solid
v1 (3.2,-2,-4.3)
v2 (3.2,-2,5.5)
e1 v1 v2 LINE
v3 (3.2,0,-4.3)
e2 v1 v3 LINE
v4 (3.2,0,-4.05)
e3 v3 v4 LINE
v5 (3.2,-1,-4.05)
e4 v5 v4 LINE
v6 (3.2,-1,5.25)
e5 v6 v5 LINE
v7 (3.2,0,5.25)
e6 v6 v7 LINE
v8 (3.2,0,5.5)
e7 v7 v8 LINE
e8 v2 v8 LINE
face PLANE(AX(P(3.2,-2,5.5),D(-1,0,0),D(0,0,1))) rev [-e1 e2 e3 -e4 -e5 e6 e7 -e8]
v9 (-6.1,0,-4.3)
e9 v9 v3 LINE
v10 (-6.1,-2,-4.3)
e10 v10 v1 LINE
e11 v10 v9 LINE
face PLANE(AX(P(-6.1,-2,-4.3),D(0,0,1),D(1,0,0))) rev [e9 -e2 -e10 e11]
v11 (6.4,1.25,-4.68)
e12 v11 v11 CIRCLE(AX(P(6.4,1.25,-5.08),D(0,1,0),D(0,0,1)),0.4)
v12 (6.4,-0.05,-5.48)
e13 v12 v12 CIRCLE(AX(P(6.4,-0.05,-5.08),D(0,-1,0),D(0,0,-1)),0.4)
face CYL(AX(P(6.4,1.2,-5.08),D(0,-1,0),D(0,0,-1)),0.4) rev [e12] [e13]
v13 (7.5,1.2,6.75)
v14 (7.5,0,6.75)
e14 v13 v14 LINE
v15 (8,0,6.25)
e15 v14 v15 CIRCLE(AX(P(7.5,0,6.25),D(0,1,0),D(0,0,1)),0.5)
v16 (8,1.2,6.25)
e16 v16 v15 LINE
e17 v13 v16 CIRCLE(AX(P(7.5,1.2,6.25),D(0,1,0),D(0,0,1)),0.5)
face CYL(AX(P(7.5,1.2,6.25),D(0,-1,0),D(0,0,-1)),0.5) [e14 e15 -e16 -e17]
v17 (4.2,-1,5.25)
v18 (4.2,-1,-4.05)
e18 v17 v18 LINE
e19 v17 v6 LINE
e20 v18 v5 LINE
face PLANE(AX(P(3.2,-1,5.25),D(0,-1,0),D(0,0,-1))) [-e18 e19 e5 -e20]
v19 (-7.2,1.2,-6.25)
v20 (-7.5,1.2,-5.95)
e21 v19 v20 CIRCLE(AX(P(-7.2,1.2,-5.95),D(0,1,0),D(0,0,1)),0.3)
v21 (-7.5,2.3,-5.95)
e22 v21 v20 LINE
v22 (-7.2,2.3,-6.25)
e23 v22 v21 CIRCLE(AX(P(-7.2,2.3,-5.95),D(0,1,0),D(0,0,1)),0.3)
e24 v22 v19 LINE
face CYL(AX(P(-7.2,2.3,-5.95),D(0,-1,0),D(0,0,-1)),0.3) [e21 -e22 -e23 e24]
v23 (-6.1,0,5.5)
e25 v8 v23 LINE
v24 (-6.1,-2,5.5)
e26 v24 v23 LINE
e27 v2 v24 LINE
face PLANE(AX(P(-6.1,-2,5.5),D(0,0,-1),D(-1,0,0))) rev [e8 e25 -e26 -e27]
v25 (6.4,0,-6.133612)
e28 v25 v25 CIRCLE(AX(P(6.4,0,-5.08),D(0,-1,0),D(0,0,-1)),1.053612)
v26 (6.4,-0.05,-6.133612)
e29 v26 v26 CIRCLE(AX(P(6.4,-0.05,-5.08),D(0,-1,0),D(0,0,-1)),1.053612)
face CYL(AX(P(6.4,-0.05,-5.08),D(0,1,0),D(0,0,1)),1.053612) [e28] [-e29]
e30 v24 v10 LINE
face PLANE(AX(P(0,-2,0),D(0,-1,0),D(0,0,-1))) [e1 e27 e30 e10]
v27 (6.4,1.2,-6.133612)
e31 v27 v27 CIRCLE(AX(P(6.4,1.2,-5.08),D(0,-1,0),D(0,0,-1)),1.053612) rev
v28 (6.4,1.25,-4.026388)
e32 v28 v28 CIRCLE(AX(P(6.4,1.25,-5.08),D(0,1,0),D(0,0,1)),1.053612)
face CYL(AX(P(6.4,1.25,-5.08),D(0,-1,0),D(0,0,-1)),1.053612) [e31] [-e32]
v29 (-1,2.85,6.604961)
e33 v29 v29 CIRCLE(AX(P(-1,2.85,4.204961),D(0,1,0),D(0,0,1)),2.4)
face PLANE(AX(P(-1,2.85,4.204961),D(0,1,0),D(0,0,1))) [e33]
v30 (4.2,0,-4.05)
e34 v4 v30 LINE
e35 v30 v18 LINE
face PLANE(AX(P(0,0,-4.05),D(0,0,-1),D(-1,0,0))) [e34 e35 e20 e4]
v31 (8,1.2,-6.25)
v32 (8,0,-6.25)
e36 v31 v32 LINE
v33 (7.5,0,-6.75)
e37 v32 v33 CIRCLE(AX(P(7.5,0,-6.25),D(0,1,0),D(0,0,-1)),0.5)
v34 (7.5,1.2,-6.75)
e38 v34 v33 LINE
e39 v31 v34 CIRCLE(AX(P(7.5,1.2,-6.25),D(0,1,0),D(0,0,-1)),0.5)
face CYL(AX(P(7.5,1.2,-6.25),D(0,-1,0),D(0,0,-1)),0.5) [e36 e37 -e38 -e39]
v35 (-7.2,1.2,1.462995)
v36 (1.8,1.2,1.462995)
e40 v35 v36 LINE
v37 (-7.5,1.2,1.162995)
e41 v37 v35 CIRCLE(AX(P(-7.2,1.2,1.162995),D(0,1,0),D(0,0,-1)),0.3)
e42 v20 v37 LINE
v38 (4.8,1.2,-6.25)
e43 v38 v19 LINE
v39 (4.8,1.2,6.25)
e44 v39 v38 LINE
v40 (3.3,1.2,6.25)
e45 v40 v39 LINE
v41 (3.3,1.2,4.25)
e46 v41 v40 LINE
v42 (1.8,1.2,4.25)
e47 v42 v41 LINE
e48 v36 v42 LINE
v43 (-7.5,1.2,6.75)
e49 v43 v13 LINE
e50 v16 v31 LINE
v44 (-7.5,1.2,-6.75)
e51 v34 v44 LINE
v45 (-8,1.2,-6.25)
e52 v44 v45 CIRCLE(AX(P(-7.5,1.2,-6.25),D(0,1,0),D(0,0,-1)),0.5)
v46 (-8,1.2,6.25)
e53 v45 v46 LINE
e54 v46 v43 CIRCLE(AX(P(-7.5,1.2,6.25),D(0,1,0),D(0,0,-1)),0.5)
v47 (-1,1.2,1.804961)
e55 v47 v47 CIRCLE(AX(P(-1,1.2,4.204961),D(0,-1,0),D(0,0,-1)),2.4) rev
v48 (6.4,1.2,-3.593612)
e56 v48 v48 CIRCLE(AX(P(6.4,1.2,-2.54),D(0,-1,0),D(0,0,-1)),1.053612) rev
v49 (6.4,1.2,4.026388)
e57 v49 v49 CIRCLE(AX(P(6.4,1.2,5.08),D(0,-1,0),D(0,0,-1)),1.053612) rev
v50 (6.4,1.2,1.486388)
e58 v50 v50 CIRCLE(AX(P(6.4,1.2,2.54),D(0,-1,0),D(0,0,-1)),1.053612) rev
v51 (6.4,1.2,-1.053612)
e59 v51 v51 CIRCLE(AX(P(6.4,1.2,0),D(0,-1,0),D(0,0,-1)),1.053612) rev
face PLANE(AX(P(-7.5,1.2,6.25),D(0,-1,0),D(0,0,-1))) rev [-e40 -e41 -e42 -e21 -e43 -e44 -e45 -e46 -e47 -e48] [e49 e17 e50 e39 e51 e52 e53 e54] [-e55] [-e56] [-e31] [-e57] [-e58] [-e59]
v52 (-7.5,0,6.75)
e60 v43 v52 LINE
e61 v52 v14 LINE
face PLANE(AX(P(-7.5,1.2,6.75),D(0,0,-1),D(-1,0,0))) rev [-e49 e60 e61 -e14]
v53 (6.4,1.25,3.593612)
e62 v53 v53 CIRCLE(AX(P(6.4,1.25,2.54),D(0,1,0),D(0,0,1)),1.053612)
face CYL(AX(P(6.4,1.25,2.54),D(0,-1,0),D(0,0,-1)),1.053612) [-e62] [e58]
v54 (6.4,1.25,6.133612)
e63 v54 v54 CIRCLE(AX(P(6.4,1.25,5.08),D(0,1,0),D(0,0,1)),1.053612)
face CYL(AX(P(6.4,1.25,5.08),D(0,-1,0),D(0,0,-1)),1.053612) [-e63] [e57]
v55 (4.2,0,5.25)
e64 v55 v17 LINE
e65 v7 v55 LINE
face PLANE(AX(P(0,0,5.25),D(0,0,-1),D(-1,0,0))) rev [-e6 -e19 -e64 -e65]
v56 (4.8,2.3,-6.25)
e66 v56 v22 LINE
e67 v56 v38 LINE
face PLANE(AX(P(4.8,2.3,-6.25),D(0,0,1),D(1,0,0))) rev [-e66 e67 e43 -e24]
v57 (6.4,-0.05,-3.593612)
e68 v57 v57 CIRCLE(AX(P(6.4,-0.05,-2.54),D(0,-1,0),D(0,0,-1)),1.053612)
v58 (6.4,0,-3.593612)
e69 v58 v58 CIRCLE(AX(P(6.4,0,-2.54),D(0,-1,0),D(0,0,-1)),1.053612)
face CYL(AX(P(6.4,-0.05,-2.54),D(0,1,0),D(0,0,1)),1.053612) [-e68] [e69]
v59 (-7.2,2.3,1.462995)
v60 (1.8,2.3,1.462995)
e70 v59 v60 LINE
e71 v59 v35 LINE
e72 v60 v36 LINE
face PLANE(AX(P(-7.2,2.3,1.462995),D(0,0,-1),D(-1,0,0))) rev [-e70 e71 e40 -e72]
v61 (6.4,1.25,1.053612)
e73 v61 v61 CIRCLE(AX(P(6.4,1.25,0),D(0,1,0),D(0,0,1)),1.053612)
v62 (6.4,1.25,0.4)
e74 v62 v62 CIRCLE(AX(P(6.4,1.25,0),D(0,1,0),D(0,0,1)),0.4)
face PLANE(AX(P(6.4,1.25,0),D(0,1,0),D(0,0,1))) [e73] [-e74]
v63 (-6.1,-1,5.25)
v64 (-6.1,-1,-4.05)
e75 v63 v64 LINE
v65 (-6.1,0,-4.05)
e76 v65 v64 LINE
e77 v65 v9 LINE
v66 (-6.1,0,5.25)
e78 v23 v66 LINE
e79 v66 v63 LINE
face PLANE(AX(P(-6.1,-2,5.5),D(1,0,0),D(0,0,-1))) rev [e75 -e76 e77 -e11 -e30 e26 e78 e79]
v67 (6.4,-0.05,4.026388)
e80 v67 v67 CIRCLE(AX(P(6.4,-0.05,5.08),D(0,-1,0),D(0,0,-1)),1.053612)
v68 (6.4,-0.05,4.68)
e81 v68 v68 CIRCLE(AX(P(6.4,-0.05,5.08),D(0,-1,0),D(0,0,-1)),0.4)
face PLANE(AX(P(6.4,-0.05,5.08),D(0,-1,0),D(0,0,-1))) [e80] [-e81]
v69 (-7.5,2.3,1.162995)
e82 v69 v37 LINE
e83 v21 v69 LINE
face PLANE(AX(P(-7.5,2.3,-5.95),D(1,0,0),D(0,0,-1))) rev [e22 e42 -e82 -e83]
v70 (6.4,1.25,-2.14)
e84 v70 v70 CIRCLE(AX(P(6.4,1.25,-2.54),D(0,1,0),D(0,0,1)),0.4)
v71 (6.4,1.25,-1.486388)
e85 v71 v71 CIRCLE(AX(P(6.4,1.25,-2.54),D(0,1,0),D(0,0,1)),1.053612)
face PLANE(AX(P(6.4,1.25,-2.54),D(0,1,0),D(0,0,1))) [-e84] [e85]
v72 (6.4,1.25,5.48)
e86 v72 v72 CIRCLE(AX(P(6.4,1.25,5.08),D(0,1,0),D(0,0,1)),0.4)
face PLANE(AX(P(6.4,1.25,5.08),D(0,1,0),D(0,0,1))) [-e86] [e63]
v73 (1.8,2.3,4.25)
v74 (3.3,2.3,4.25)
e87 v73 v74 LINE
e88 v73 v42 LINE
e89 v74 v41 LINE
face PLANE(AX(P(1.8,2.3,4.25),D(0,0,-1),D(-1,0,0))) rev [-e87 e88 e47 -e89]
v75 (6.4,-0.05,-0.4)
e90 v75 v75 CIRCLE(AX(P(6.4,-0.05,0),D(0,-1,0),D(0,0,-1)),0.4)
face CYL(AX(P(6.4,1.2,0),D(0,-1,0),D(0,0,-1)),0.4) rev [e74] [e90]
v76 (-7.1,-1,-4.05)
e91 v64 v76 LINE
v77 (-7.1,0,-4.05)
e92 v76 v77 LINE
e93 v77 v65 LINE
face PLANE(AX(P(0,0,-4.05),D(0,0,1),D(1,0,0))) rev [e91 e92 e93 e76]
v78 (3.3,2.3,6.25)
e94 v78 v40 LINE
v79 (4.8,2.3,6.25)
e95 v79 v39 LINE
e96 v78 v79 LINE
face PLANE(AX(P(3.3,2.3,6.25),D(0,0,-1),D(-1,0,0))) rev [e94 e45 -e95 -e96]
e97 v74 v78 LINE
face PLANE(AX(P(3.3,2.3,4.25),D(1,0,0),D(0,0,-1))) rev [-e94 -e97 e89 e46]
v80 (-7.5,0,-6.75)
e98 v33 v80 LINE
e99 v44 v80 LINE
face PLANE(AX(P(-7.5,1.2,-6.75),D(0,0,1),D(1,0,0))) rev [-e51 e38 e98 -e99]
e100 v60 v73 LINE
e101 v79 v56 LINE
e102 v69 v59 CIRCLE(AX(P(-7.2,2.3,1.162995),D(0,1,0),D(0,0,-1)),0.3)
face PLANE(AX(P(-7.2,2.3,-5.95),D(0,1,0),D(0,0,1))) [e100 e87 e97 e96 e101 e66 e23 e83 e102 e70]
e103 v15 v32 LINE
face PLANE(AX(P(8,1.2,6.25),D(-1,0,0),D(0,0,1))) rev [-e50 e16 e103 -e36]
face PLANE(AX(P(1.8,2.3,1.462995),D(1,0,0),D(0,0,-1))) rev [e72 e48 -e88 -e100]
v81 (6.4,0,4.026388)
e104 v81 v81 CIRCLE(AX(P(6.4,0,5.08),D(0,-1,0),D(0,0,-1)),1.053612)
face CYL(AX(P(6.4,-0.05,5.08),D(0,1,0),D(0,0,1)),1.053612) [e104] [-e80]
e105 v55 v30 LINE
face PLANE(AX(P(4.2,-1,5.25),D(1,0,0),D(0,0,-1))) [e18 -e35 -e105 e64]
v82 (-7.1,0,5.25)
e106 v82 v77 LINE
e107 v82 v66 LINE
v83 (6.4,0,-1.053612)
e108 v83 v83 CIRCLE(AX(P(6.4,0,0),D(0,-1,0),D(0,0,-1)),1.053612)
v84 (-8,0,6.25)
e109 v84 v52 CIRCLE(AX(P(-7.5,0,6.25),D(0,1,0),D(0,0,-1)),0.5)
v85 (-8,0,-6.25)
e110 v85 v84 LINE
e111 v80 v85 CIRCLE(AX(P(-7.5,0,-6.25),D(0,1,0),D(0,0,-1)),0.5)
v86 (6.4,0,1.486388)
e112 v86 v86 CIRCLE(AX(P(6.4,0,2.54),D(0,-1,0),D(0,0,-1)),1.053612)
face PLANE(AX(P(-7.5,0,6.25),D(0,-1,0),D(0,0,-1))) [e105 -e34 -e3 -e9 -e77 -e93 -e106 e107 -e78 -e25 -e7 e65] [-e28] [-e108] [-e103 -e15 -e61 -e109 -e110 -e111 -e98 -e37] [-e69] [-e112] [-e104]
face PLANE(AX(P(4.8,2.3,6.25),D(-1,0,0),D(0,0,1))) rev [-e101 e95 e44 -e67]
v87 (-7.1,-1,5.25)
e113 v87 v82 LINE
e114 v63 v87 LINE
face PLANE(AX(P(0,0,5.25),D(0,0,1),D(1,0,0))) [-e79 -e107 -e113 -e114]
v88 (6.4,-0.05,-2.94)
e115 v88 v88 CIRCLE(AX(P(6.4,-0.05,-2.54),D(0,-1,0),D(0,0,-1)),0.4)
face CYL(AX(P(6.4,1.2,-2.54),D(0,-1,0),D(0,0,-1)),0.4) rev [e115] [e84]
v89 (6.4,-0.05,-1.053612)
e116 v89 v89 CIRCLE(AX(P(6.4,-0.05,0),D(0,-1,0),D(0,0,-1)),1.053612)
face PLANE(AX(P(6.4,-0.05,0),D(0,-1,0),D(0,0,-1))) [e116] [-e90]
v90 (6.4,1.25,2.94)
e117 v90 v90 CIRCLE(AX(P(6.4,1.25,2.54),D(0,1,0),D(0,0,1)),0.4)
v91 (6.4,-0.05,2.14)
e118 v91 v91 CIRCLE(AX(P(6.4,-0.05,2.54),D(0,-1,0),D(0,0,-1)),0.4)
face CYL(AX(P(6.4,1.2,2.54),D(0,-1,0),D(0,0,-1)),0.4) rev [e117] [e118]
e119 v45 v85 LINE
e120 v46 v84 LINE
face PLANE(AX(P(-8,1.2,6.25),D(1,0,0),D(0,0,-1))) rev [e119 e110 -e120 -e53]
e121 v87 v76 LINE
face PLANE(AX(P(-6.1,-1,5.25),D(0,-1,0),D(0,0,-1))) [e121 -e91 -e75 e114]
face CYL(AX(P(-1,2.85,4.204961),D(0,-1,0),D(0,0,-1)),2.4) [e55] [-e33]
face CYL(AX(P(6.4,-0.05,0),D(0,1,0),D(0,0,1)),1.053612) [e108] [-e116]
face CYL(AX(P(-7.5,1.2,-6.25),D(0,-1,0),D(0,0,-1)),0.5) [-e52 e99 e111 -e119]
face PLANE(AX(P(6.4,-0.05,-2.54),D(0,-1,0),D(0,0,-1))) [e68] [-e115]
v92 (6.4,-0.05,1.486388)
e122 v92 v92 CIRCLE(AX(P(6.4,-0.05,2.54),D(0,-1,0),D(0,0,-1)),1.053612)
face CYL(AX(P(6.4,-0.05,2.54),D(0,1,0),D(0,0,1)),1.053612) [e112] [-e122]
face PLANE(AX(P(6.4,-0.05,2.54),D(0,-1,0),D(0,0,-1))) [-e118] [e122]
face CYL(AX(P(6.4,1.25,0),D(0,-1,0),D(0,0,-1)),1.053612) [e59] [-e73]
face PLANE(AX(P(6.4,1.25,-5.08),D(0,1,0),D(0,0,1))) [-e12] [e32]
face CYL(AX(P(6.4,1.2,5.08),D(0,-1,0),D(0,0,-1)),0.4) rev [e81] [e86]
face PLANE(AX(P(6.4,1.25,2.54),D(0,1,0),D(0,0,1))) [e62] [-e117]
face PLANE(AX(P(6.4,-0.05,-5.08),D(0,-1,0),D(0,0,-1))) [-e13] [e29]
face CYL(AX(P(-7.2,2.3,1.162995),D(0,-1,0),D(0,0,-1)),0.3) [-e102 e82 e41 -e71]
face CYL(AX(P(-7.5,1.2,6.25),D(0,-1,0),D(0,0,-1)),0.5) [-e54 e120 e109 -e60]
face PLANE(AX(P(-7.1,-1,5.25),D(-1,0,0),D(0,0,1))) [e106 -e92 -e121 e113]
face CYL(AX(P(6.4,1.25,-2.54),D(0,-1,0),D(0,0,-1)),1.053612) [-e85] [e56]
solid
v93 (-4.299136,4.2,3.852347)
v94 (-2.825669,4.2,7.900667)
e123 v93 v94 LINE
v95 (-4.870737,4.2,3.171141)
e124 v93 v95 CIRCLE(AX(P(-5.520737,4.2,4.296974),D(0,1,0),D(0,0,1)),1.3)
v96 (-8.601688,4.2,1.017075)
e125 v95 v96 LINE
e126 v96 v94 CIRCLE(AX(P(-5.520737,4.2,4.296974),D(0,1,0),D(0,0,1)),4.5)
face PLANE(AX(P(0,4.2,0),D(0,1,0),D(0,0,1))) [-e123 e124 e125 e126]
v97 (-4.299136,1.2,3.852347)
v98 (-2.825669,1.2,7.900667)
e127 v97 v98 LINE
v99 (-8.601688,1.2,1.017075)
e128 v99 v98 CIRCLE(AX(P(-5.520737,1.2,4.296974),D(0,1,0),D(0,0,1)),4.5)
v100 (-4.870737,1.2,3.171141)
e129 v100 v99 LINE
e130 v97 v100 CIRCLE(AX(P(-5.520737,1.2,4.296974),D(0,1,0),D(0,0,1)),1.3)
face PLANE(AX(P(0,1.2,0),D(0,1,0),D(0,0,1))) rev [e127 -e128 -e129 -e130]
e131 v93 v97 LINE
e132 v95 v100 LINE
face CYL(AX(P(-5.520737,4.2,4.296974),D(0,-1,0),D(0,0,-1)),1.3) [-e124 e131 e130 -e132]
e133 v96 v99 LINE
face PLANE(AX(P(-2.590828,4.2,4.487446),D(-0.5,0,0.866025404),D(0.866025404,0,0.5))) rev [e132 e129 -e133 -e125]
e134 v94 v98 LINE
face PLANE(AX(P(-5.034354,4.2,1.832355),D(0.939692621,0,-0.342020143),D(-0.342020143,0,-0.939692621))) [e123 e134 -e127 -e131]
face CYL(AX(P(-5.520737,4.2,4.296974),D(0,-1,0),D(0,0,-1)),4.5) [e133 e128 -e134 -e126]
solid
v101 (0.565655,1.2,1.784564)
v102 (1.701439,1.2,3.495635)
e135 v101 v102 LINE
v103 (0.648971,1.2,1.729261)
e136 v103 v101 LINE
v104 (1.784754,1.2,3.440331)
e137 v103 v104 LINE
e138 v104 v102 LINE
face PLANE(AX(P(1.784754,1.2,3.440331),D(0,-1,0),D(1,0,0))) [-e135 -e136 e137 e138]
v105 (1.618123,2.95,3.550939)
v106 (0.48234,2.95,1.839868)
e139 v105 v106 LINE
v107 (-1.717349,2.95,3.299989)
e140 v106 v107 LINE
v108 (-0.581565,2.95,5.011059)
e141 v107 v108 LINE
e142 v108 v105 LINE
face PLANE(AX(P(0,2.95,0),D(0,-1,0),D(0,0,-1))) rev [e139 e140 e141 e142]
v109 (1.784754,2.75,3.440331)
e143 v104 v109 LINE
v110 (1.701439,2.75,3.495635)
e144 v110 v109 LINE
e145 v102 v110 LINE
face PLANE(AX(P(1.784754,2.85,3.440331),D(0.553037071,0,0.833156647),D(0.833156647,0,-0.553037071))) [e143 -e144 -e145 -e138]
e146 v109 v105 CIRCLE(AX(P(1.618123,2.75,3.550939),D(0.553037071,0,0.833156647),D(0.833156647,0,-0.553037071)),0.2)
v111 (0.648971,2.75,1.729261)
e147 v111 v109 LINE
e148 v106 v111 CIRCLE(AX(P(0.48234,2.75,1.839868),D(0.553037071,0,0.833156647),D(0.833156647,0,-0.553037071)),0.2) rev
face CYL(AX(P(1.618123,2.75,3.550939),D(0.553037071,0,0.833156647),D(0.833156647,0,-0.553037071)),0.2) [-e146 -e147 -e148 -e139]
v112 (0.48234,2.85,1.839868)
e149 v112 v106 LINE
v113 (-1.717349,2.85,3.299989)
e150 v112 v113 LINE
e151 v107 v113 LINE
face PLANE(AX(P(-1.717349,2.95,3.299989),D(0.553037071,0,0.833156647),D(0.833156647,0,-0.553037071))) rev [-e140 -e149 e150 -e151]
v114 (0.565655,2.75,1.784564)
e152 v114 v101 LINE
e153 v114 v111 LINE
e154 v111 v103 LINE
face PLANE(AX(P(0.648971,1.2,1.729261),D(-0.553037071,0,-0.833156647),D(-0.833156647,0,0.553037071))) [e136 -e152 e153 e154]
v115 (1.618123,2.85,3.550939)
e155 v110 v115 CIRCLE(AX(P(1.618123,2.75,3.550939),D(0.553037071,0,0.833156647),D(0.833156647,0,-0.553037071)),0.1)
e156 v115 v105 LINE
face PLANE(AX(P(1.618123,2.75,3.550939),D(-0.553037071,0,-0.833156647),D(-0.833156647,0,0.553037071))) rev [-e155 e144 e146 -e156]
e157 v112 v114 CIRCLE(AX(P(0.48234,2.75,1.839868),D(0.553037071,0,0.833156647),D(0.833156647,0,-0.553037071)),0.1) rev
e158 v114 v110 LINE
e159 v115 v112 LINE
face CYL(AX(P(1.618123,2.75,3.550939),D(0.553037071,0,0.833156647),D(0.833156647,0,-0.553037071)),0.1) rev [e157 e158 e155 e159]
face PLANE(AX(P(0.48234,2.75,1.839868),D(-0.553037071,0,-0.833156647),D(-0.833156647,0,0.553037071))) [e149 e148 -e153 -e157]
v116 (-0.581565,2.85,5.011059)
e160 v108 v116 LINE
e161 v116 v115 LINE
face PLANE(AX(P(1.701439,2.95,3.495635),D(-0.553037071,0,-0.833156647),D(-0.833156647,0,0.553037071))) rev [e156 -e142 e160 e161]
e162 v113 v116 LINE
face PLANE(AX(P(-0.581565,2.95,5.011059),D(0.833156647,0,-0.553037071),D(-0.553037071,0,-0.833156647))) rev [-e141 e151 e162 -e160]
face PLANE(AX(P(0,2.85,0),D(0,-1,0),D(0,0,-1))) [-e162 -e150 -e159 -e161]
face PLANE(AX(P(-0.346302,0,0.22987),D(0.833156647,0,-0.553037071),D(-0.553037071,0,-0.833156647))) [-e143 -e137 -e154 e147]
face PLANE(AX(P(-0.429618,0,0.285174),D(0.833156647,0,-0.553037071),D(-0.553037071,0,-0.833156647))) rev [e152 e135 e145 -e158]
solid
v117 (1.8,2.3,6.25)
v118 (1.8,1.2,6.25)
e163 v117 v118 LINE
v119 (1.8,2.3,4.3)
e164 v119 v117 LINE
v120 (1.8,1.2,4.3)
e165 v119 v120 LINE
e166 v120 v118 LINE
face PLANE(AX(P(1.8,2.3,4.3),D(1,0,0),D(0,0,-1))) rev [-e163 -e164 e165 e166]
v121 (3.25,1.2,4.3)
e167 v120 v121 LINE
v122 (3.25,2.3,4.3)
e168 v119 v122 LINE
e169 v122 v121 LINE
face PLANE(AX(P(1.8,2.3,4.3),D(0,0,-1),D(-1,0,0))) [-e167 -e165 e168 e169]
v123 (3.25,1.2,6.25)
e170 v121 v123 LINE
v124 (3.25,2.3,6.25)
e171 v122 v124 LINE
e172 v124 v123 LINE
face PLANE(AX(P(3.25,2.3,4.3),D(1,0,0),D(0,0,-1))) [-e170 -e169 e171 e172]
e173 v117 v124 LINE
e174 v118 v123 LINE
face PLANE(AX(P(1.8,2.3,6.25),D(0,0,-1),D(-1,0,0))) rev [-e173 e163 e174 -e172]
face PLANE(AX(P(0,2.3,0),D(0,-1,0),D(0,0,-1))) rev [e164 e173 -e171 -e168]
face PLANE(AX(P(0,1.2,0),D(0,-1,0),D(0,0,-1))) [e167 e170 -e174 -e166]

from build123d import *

# Parameters (mm, degrees)
ESQUISSE1_R                             = 0.4
PCB_DEPTH                               = 1.2
ESQUISSE2_R                             = 1.053612245
ESQUISSE2_R_2                           = 0.4
TOP_PADS_DEPTH                          = 0.05
BOTTOM_START                            = -1.25
ESQUISSE2_2_R                           = 1.053612245
ESQUISSE2_2_R_2                         = 0.4
BOTTOM_PADS_DEPTH                       = 0.05
ESQUISSE3_R                             = 2.4
BACKUP_BATT_DEPTH                       = 1.65
ANCILLARY_COMPS_DEPTH                   = 1.1
ESQUISSE5_W                             = 1.45
ESQUISSE5_H                             = 1.95
ACTIVITY_LED_DEPTH                      = 1.1
ESQUISSE6_W                             = 9.3
ESQUISSE6_H                             = 9.8
ATGM336H_MODULE_DEPTH                   = 2
MODULE_S_START                          = -0.25
ESQUISSE7_W                             = 1
ESQUISSE7_H                             = 1
MODULE_S_SOLDER_JOINTS_DEPTH            = 9.3
ESQUISSE8_R                             = 1.3
IPEX_CONNECTOR_SWIVEL_PLACEHOLDER_DEPTH = 3
BATTERY_TAB_BIS_DEPTH                   = 0.1
BATTERY_TAB_TER_STRIP_W                 = 0.6
BATTERY_TAB_TER_STRIP_H                 = 0.1
BATTERY_TAB_TER_STRIP_CUT_DEPTH         = 2.053720398
BATTERY_TAB_TER_DEPTH                   = 2.053720398


# Sheet-metal steps are written as plain solids
with BuildPart() as part:
    # Esquisse1 → PCB (new body)
    with BuildSketch(Plane(origin=(0, 0, 0), x_dir=(1, 0, 0), z_dir=(0, 1, 0))):
        with BuildLine():
            Line((-7.5, -6.75), (7.5, -6.75))
            ThreePointArc((7.5, -6.75), (7.853553391, -6.603553391), (8, -6.25))
            Line((8, -6.25), (8, 6.25))
            ThreePointArc((8, 6.25), (7.853553391, 6.603553391), (7.5, 6.75))
            Line((7.5, 6.75), (-7.5, 6.75))
            ThreePointArc((-7.5, 6.75), (-7.853553391, 6.603553391), (-8, 6.25))
            Line((-8, 6.25), (-8, -6.25))
            ThreePointArc((-8, -6.25), (-7.853553391, -6.603553391), (-7.5, -6.75))
        make_face()
        with Locations(Location((6.4, 0, 0), (0, 0, 270))):
            Circle(ESQUISSE1_R, mode=Mode.SUBTRACT)
        with Locations(Location((6.4, 2.54, 0), (0, 0, 270))):
            Circle(ESQUISSE1_R, mode=Mode.SUBTRACT)
        with Locations(Location((6.4, 5.08, 0), (0, 0, 270))):
            Circle(ESQUISSE1_R, mode=Mode.SUBTRACT)
        with Locations(Location((6.4, -5.08, 0), (0, 0, 90))):
            Circle(ESQUISSE1_R, mode=Mode.SUBTRACT)
        with Locations(Location((6.4, -2.54, 0), (0, 0, 90))):
            Circle(ESQUISSE1_R, mode=Mode.SUBTRACT)
    extrude(amount=PCB_DEPTH)

    # Esquisse2 → Top pads (add)
    # profile 1 of 5: a face of its own
    with BuildSketch(Plane(origin=(0, 1.2, 0), x_dir=(1, 0, 0), z_dir=(0, 1, 0))):
        with Locations(Location((6.4, 5.08, 0), (0, 0, 90))):
            Circle(ESQUISSE2_R)
        with Locations(Location((6.4, 5.08, 0), (0, 0, 270))):
            Circle(ESQUISSE2_R_2, mode=Mode.SUBTRACT)
    # profile 2 of 5: a face of its own
    with BuildSketch(Plane(origin=(0, 1.2, 0), x_dir=(1, 0, 0), z_dir=(0, 1, 0))):
        with Locations(Location((6.4, 2.54, 0), (0, 0, 90))):
            Circle(ESQUISSE2_R)
        with Locations(Location((6.4, 2.54, 0), (0, 0, 270))):
            Circle(ESQUISSE2_R_2, mode=Mode.SUBTRACT)
    # profile 3 of 5: a face of its own
    with BuildSketch(Plane(origin=(0, 1.2, 0), x_dir=(1, 0, 0), z_dir=(0, 1, 0))):
        with Locations(Location((6.4, 0, 0), (0, 0, 90))):
            Circle(ESQUISSE2_R)
        with Locations(Location((6.4, 0, 0), (0, 0, 270))):
            Circle(ESQUISSE2_R_2, mode=Mode.SUBTRACT)
    # profile 4 of 5: a face of its own
    with BuildSketch(Plane(origin=(0, 1.2, 0), x_dir=(1, 0, 0), z_dir=(0, 1, 0))):
        with Locations(Location((6.4, -2.54, 0), (0, 0, 90))):
            Circle(ESQUISSE2_R)
        with Locations(Location((6.4, -2.54, 0), (0, 0, 90))):
            Circle(ESQUISSE2_R_2, mode=Mode.SUBTRACT)
    # profile 5 of 5: a face of its own
    with BuildSketch(Plane(origin=(0, 1.2, 0), x_dir=(1, 0, 0), z_dir=(0, 1, 0))):
        with Locations(Location((6.4, -5.08, 0), (0, 0, 90))):
            Circle(ESQUISSE2_R)
        with Locations(Location((6.4, -5.08, 0), (0, 0, 90))):
            Circle(ESQUISSE2_R_2, mode=Mode.SUBTRACT)
    extrude(amount=TOP_PADS_DEPTH)

    # Esquisse2<2> → Bottom pads (add)
    # profile 1 of 5: a face of its own
    with BuildSketch(Plane(origin=(0, 1.2, 0), x_dir=(1, 0, 0), z_dir=(0, 1, 0)).offset(BOTTOM_START)):
        with Locations(Location((6.4, 5.08, 0), (0, 0, 90))):
            Circle(ESQUISSE2_2_R)
        with Locations(Location((6.4, 5.08, 0), (0, 0, 90))):
            Circle(ESQUISSE2_2_R_2, mode=Mode.SUBTRACT)
    # profile 2 of 5: a face of its own
    with BuildSketch(Plane(origin=(0, 1.2, 0), x_dir=(1, 0, 0), z_dir=(0, 1, 0)).offset(BOTTOM_START)):
        with Locations(Location((6.4, 2.54, 0), (0, 0, 90))):
            Circle(ESQUISSE2_2_R)
        with Locations(Location((6.4, 2.54, 0), (0, 0, 90))):
            Circle(ESQUISSE2_2_R_2, mode=Mode.SUBTRACT)
    # profile 3 of 5: a face of its own
    with BuildSketch(Plane(origin=(0, 1.2, 0), x_dir=(1, 0, 0), z_dir=(0, 1, 0)).offset(BOTTOM_START)):
        with Locations(Location((6.4, 0, 0), (0, 0, 90))):
            Circle(ESQUISSE2_2_R)
        with Locations(Location((6.4, 0, 0), (0, 0, 90))):
            Circle(ESQUISSE2_2_R_2, mode=Mode.SUBTRACT)
    # profile 4 of 5: a face of its own
    with BuildSketch(Plane(origin=(0, 1.2, 0), x_dir=(1, 0, 0), z_dir=(0, 1, 0)).offset(BOTTOM_START)):
        with Locations(Location((6.4, -2.54, 0), (0, 0, 90))):
            Circle(ESQUISSE2_2_R)
        with Locations(Location((6.4, -2.54, 0), (0, 0, 90))):
            Circle(ESQUISSE2_2_R_2, mode=Mode.SUBTRACT)
    # profile 5 of 5: a face of its own
    with BuildSketch(Plane(origin=(0, 1.2, 0), x_dir=(1, 0, 0), z_dir=(0, 1, 0)).offset(BOTTOM_START)):
        with Locations(Location((6.4, -5.08, 0), (0, 0, 90))):
            Circle(ESQUISSE2_2_R)
        with Locations(Location((6.4, -5.08, 0), (0, 0, 90))):
            Circle(ESQUISSE2_2_R_2, mode=Mode.SUBTRACT)
    extrude(amount=BOTTOM_PADS_DEPTH)

    # Esquisse3 → Backup batt (add)
    with BuildSketch(Plane(origin=(0, 1.2, 0), x_dir=(1, 0, 0), z_dir=(0, 1, 0))):
        with Locations(Location((-1, -4.204961255, 0), (0, 0, 90))):
            Circle(ESQUISSE3_R)
    extrude(amount=BACKUP_BATT_DEPTH)

    # Esquisse4 → ancillary comps (add)
    with BuildSketch(Plane(origin=(0, 1.2, 0), x_dir=(1, 0, 0), z_dir=(0, 1, 0))):
        with BuildLine():
            Line((-7.2, -1.462995273), (1.8, -1.462995273))
            Line((1.8, -1.462995273), (1.8, -4.25))
            Line((1.8, -4.25), (3.3, -4.25))
            Line((3.3, -4.25), (3.3, -6.25))
            Line((3.3, -6.25), (4.8, -6.25))
            Line((4.8, -6.25), (4.8, 6.25))
            Line((4.8, 6.25), (-7.2, 6.25))
            ThreePointArc((-7.2, 6.25), (-7.412132034, 6.162132034), (-7.5, 5.95))
            Line((-7.5, 5.95), (-7.5, -1.162995273))
            ThreePointArc((-7.5, -1.162995273), (-7.412132034, -1.375127307), (-7.2, -1.462995273))
        make_face()
    extrude(amount=ANCILLARY_COMPS_DEPTH)

    # Esquisse6 → ATGM336H module (add)
    with BuildSketch(Plane.XZ):
        with Locations((-1.45, 0.6)):
            Rectangle(ESQUISSE6_W, ESQUISSE6_H)
    extrude(amount=ATGM336H_MODULE_DEPTH)

    # Esquisse7 → module's solder joints (add)
    with BuildSketch(Plane(origin=(0, 0, -4.3), x_dir=(-1, 0, 0), z_dir=(0, 0, -1)).offset(MODULE_S_START)):
        with Locations((6.6, -0.5)):
            Rectangle(ESQUISSE7_W, ESQUISSE7_H)
        with Locations((-3.7, -0.5)):
            Rectangle(ESQUISSE7_W, ESQUISSE7_H)
    extrude(amount=-MODULE_S_SOLDER_JOINTS_DEPTH)


with BuildPart() as body_2:
    # Esquisse5 → Activity led (new body)
    with BuildSketch(Plane(origin=(0, 1.2, 0), x_dir=(1, 0, 0), z_dir=(0, 1, 0))):
        with Locations((2.525, -5.275)):
            Rectangle(ESQUISSE5_W, ESQUISSE5_H)
    extrude(amount=ACTIVITY_LED_DEPTH)


with BuildPart() as body_3:
    # Esquisse8 → IPEX connector swivel placeholder (new body)
    with BuildSketch(Plane(origin=(0, 1.2, 0), x_dir=(1, 0, 0), z_dir=(0, 1, 0))):
        with BuildLine():
            Line((-8, -6.25), (-8, -1.364459606))
            Line((-8, -1.364459606), (-8.601688499, -1.017074589))
            ThreePointArc((-8.601688499, -1.017074589), (-8.967936872, -7.18951778), (-2.8256686, -7.900667055))
            Line((-2.8256686, -7.900667055), (-3.244477157, -6.75))
            Line((-3.244477157, -6.75), (-7.5, -6.75))
            ThreePointArc((-7.5, -6.75), (-7.853553391, -6.603553391), (-8, -6.25))
        make_face()
        with Locations((-5.520736878, -4.296973537)):
            Circle(ESQUISSE8_R)
        with BuildLine():
            ThreePointArc((-4.220736878, -4.296973537), (-6.646569903, -4.946973537), (-4.870736878, -3.171140512))
            Line((-4.870736878, -3.171140512), (-8, -1.364459606))
            Line((-8, -1.364459606), (-8, -6.25))
            ThreePointArc((-8, -6.25), (-7.853553391, -6.603553391), (-7.5, -6.75))
            Line((-7.5, -6.75), (-3.244477157, -6.75))
            Line((-3.244477157, -6.75), (-4.299136471, -3.85234735))
            ThreePointArc((-4.299136471, -3.85234735), (-4.240486799, -4.071230906), (-4.220736878, -4.296973537))
        make_face()
    extrude(amount=IPEX_CONNECTOR_SWIVEL_PLACEHOLDER_DEPTH)


with BuildPart() as body_4:
    # Esquisse9 → Battery tab (bis) (new body)
    with BuildSketch(Plane(origin=(0, 2.85, 0), x_dir=(1, 0, 0), z_dir=(0, 1, 0))):
        Polygon((-0.581565149, -5.011059392), (-1.717348662, -3.299988591), (0.565655318, -1.784564286), (1.701438831, -3.495635087), align=None)
    extrude(amount=BATTERY_TAB_BIS_DEPTH)

    # Battery tab (ter) strip (across the edge) → Battery tab (ter) strip cut (cut)
    with BuildSketch(Plane(origin=(0.565655318, 2.85, 1.784564286), x_dir=(-0.8331566469901595, -3.4452318542127344e-15, 0.553037070706942), z_dir=(0.553037070706942, 0, 0.8331566469901595))):
        with Locations((-0.2, -0.05)):
            Rectangle(BATTERY_TAB_TER_STRIP_W, BATTERY_TAB_TER_STRIP_H)
    extrude(amount=BATTERY_TAB_TER_STRIP_CUT_DEPTH, mode=Mode.SUBTRACT)

    # Battery tab (ter) section (across the edge) → Battery tab (ter) (add)
    with BuildSketch(Plane(origin=(0.565655318, 2.85, 1.784564286), x_dir=(-0.8331566469901595, -3.4452318542127344e-15, 0.553037070706942), z_dir=(0.553037070706942, 0, 0.8331566469901595))):
        with BuildLine():
            Line((-0.1, 0.1), (-0.1, 1.65))
            Line((-0.1, 1.65), (0, 1.65))
            Line((0, 1.65), (0, 0.1))
            ThreePointArc((0, 0.1), (0.029289322, 0.029289322), (0.1, 0))
            Line((0.1, 0), (0.1, -0.1))
            ThreePointArc((0.1, -0.1), (-0.041421356, -0.041421356), (-0.1, 0.1))
        make_face()
    extrude(amount=BATTERY_TAB_TER_DEPTH)


solid = Compound([part.part, body_2.part, body_3.part, body_4.part])
